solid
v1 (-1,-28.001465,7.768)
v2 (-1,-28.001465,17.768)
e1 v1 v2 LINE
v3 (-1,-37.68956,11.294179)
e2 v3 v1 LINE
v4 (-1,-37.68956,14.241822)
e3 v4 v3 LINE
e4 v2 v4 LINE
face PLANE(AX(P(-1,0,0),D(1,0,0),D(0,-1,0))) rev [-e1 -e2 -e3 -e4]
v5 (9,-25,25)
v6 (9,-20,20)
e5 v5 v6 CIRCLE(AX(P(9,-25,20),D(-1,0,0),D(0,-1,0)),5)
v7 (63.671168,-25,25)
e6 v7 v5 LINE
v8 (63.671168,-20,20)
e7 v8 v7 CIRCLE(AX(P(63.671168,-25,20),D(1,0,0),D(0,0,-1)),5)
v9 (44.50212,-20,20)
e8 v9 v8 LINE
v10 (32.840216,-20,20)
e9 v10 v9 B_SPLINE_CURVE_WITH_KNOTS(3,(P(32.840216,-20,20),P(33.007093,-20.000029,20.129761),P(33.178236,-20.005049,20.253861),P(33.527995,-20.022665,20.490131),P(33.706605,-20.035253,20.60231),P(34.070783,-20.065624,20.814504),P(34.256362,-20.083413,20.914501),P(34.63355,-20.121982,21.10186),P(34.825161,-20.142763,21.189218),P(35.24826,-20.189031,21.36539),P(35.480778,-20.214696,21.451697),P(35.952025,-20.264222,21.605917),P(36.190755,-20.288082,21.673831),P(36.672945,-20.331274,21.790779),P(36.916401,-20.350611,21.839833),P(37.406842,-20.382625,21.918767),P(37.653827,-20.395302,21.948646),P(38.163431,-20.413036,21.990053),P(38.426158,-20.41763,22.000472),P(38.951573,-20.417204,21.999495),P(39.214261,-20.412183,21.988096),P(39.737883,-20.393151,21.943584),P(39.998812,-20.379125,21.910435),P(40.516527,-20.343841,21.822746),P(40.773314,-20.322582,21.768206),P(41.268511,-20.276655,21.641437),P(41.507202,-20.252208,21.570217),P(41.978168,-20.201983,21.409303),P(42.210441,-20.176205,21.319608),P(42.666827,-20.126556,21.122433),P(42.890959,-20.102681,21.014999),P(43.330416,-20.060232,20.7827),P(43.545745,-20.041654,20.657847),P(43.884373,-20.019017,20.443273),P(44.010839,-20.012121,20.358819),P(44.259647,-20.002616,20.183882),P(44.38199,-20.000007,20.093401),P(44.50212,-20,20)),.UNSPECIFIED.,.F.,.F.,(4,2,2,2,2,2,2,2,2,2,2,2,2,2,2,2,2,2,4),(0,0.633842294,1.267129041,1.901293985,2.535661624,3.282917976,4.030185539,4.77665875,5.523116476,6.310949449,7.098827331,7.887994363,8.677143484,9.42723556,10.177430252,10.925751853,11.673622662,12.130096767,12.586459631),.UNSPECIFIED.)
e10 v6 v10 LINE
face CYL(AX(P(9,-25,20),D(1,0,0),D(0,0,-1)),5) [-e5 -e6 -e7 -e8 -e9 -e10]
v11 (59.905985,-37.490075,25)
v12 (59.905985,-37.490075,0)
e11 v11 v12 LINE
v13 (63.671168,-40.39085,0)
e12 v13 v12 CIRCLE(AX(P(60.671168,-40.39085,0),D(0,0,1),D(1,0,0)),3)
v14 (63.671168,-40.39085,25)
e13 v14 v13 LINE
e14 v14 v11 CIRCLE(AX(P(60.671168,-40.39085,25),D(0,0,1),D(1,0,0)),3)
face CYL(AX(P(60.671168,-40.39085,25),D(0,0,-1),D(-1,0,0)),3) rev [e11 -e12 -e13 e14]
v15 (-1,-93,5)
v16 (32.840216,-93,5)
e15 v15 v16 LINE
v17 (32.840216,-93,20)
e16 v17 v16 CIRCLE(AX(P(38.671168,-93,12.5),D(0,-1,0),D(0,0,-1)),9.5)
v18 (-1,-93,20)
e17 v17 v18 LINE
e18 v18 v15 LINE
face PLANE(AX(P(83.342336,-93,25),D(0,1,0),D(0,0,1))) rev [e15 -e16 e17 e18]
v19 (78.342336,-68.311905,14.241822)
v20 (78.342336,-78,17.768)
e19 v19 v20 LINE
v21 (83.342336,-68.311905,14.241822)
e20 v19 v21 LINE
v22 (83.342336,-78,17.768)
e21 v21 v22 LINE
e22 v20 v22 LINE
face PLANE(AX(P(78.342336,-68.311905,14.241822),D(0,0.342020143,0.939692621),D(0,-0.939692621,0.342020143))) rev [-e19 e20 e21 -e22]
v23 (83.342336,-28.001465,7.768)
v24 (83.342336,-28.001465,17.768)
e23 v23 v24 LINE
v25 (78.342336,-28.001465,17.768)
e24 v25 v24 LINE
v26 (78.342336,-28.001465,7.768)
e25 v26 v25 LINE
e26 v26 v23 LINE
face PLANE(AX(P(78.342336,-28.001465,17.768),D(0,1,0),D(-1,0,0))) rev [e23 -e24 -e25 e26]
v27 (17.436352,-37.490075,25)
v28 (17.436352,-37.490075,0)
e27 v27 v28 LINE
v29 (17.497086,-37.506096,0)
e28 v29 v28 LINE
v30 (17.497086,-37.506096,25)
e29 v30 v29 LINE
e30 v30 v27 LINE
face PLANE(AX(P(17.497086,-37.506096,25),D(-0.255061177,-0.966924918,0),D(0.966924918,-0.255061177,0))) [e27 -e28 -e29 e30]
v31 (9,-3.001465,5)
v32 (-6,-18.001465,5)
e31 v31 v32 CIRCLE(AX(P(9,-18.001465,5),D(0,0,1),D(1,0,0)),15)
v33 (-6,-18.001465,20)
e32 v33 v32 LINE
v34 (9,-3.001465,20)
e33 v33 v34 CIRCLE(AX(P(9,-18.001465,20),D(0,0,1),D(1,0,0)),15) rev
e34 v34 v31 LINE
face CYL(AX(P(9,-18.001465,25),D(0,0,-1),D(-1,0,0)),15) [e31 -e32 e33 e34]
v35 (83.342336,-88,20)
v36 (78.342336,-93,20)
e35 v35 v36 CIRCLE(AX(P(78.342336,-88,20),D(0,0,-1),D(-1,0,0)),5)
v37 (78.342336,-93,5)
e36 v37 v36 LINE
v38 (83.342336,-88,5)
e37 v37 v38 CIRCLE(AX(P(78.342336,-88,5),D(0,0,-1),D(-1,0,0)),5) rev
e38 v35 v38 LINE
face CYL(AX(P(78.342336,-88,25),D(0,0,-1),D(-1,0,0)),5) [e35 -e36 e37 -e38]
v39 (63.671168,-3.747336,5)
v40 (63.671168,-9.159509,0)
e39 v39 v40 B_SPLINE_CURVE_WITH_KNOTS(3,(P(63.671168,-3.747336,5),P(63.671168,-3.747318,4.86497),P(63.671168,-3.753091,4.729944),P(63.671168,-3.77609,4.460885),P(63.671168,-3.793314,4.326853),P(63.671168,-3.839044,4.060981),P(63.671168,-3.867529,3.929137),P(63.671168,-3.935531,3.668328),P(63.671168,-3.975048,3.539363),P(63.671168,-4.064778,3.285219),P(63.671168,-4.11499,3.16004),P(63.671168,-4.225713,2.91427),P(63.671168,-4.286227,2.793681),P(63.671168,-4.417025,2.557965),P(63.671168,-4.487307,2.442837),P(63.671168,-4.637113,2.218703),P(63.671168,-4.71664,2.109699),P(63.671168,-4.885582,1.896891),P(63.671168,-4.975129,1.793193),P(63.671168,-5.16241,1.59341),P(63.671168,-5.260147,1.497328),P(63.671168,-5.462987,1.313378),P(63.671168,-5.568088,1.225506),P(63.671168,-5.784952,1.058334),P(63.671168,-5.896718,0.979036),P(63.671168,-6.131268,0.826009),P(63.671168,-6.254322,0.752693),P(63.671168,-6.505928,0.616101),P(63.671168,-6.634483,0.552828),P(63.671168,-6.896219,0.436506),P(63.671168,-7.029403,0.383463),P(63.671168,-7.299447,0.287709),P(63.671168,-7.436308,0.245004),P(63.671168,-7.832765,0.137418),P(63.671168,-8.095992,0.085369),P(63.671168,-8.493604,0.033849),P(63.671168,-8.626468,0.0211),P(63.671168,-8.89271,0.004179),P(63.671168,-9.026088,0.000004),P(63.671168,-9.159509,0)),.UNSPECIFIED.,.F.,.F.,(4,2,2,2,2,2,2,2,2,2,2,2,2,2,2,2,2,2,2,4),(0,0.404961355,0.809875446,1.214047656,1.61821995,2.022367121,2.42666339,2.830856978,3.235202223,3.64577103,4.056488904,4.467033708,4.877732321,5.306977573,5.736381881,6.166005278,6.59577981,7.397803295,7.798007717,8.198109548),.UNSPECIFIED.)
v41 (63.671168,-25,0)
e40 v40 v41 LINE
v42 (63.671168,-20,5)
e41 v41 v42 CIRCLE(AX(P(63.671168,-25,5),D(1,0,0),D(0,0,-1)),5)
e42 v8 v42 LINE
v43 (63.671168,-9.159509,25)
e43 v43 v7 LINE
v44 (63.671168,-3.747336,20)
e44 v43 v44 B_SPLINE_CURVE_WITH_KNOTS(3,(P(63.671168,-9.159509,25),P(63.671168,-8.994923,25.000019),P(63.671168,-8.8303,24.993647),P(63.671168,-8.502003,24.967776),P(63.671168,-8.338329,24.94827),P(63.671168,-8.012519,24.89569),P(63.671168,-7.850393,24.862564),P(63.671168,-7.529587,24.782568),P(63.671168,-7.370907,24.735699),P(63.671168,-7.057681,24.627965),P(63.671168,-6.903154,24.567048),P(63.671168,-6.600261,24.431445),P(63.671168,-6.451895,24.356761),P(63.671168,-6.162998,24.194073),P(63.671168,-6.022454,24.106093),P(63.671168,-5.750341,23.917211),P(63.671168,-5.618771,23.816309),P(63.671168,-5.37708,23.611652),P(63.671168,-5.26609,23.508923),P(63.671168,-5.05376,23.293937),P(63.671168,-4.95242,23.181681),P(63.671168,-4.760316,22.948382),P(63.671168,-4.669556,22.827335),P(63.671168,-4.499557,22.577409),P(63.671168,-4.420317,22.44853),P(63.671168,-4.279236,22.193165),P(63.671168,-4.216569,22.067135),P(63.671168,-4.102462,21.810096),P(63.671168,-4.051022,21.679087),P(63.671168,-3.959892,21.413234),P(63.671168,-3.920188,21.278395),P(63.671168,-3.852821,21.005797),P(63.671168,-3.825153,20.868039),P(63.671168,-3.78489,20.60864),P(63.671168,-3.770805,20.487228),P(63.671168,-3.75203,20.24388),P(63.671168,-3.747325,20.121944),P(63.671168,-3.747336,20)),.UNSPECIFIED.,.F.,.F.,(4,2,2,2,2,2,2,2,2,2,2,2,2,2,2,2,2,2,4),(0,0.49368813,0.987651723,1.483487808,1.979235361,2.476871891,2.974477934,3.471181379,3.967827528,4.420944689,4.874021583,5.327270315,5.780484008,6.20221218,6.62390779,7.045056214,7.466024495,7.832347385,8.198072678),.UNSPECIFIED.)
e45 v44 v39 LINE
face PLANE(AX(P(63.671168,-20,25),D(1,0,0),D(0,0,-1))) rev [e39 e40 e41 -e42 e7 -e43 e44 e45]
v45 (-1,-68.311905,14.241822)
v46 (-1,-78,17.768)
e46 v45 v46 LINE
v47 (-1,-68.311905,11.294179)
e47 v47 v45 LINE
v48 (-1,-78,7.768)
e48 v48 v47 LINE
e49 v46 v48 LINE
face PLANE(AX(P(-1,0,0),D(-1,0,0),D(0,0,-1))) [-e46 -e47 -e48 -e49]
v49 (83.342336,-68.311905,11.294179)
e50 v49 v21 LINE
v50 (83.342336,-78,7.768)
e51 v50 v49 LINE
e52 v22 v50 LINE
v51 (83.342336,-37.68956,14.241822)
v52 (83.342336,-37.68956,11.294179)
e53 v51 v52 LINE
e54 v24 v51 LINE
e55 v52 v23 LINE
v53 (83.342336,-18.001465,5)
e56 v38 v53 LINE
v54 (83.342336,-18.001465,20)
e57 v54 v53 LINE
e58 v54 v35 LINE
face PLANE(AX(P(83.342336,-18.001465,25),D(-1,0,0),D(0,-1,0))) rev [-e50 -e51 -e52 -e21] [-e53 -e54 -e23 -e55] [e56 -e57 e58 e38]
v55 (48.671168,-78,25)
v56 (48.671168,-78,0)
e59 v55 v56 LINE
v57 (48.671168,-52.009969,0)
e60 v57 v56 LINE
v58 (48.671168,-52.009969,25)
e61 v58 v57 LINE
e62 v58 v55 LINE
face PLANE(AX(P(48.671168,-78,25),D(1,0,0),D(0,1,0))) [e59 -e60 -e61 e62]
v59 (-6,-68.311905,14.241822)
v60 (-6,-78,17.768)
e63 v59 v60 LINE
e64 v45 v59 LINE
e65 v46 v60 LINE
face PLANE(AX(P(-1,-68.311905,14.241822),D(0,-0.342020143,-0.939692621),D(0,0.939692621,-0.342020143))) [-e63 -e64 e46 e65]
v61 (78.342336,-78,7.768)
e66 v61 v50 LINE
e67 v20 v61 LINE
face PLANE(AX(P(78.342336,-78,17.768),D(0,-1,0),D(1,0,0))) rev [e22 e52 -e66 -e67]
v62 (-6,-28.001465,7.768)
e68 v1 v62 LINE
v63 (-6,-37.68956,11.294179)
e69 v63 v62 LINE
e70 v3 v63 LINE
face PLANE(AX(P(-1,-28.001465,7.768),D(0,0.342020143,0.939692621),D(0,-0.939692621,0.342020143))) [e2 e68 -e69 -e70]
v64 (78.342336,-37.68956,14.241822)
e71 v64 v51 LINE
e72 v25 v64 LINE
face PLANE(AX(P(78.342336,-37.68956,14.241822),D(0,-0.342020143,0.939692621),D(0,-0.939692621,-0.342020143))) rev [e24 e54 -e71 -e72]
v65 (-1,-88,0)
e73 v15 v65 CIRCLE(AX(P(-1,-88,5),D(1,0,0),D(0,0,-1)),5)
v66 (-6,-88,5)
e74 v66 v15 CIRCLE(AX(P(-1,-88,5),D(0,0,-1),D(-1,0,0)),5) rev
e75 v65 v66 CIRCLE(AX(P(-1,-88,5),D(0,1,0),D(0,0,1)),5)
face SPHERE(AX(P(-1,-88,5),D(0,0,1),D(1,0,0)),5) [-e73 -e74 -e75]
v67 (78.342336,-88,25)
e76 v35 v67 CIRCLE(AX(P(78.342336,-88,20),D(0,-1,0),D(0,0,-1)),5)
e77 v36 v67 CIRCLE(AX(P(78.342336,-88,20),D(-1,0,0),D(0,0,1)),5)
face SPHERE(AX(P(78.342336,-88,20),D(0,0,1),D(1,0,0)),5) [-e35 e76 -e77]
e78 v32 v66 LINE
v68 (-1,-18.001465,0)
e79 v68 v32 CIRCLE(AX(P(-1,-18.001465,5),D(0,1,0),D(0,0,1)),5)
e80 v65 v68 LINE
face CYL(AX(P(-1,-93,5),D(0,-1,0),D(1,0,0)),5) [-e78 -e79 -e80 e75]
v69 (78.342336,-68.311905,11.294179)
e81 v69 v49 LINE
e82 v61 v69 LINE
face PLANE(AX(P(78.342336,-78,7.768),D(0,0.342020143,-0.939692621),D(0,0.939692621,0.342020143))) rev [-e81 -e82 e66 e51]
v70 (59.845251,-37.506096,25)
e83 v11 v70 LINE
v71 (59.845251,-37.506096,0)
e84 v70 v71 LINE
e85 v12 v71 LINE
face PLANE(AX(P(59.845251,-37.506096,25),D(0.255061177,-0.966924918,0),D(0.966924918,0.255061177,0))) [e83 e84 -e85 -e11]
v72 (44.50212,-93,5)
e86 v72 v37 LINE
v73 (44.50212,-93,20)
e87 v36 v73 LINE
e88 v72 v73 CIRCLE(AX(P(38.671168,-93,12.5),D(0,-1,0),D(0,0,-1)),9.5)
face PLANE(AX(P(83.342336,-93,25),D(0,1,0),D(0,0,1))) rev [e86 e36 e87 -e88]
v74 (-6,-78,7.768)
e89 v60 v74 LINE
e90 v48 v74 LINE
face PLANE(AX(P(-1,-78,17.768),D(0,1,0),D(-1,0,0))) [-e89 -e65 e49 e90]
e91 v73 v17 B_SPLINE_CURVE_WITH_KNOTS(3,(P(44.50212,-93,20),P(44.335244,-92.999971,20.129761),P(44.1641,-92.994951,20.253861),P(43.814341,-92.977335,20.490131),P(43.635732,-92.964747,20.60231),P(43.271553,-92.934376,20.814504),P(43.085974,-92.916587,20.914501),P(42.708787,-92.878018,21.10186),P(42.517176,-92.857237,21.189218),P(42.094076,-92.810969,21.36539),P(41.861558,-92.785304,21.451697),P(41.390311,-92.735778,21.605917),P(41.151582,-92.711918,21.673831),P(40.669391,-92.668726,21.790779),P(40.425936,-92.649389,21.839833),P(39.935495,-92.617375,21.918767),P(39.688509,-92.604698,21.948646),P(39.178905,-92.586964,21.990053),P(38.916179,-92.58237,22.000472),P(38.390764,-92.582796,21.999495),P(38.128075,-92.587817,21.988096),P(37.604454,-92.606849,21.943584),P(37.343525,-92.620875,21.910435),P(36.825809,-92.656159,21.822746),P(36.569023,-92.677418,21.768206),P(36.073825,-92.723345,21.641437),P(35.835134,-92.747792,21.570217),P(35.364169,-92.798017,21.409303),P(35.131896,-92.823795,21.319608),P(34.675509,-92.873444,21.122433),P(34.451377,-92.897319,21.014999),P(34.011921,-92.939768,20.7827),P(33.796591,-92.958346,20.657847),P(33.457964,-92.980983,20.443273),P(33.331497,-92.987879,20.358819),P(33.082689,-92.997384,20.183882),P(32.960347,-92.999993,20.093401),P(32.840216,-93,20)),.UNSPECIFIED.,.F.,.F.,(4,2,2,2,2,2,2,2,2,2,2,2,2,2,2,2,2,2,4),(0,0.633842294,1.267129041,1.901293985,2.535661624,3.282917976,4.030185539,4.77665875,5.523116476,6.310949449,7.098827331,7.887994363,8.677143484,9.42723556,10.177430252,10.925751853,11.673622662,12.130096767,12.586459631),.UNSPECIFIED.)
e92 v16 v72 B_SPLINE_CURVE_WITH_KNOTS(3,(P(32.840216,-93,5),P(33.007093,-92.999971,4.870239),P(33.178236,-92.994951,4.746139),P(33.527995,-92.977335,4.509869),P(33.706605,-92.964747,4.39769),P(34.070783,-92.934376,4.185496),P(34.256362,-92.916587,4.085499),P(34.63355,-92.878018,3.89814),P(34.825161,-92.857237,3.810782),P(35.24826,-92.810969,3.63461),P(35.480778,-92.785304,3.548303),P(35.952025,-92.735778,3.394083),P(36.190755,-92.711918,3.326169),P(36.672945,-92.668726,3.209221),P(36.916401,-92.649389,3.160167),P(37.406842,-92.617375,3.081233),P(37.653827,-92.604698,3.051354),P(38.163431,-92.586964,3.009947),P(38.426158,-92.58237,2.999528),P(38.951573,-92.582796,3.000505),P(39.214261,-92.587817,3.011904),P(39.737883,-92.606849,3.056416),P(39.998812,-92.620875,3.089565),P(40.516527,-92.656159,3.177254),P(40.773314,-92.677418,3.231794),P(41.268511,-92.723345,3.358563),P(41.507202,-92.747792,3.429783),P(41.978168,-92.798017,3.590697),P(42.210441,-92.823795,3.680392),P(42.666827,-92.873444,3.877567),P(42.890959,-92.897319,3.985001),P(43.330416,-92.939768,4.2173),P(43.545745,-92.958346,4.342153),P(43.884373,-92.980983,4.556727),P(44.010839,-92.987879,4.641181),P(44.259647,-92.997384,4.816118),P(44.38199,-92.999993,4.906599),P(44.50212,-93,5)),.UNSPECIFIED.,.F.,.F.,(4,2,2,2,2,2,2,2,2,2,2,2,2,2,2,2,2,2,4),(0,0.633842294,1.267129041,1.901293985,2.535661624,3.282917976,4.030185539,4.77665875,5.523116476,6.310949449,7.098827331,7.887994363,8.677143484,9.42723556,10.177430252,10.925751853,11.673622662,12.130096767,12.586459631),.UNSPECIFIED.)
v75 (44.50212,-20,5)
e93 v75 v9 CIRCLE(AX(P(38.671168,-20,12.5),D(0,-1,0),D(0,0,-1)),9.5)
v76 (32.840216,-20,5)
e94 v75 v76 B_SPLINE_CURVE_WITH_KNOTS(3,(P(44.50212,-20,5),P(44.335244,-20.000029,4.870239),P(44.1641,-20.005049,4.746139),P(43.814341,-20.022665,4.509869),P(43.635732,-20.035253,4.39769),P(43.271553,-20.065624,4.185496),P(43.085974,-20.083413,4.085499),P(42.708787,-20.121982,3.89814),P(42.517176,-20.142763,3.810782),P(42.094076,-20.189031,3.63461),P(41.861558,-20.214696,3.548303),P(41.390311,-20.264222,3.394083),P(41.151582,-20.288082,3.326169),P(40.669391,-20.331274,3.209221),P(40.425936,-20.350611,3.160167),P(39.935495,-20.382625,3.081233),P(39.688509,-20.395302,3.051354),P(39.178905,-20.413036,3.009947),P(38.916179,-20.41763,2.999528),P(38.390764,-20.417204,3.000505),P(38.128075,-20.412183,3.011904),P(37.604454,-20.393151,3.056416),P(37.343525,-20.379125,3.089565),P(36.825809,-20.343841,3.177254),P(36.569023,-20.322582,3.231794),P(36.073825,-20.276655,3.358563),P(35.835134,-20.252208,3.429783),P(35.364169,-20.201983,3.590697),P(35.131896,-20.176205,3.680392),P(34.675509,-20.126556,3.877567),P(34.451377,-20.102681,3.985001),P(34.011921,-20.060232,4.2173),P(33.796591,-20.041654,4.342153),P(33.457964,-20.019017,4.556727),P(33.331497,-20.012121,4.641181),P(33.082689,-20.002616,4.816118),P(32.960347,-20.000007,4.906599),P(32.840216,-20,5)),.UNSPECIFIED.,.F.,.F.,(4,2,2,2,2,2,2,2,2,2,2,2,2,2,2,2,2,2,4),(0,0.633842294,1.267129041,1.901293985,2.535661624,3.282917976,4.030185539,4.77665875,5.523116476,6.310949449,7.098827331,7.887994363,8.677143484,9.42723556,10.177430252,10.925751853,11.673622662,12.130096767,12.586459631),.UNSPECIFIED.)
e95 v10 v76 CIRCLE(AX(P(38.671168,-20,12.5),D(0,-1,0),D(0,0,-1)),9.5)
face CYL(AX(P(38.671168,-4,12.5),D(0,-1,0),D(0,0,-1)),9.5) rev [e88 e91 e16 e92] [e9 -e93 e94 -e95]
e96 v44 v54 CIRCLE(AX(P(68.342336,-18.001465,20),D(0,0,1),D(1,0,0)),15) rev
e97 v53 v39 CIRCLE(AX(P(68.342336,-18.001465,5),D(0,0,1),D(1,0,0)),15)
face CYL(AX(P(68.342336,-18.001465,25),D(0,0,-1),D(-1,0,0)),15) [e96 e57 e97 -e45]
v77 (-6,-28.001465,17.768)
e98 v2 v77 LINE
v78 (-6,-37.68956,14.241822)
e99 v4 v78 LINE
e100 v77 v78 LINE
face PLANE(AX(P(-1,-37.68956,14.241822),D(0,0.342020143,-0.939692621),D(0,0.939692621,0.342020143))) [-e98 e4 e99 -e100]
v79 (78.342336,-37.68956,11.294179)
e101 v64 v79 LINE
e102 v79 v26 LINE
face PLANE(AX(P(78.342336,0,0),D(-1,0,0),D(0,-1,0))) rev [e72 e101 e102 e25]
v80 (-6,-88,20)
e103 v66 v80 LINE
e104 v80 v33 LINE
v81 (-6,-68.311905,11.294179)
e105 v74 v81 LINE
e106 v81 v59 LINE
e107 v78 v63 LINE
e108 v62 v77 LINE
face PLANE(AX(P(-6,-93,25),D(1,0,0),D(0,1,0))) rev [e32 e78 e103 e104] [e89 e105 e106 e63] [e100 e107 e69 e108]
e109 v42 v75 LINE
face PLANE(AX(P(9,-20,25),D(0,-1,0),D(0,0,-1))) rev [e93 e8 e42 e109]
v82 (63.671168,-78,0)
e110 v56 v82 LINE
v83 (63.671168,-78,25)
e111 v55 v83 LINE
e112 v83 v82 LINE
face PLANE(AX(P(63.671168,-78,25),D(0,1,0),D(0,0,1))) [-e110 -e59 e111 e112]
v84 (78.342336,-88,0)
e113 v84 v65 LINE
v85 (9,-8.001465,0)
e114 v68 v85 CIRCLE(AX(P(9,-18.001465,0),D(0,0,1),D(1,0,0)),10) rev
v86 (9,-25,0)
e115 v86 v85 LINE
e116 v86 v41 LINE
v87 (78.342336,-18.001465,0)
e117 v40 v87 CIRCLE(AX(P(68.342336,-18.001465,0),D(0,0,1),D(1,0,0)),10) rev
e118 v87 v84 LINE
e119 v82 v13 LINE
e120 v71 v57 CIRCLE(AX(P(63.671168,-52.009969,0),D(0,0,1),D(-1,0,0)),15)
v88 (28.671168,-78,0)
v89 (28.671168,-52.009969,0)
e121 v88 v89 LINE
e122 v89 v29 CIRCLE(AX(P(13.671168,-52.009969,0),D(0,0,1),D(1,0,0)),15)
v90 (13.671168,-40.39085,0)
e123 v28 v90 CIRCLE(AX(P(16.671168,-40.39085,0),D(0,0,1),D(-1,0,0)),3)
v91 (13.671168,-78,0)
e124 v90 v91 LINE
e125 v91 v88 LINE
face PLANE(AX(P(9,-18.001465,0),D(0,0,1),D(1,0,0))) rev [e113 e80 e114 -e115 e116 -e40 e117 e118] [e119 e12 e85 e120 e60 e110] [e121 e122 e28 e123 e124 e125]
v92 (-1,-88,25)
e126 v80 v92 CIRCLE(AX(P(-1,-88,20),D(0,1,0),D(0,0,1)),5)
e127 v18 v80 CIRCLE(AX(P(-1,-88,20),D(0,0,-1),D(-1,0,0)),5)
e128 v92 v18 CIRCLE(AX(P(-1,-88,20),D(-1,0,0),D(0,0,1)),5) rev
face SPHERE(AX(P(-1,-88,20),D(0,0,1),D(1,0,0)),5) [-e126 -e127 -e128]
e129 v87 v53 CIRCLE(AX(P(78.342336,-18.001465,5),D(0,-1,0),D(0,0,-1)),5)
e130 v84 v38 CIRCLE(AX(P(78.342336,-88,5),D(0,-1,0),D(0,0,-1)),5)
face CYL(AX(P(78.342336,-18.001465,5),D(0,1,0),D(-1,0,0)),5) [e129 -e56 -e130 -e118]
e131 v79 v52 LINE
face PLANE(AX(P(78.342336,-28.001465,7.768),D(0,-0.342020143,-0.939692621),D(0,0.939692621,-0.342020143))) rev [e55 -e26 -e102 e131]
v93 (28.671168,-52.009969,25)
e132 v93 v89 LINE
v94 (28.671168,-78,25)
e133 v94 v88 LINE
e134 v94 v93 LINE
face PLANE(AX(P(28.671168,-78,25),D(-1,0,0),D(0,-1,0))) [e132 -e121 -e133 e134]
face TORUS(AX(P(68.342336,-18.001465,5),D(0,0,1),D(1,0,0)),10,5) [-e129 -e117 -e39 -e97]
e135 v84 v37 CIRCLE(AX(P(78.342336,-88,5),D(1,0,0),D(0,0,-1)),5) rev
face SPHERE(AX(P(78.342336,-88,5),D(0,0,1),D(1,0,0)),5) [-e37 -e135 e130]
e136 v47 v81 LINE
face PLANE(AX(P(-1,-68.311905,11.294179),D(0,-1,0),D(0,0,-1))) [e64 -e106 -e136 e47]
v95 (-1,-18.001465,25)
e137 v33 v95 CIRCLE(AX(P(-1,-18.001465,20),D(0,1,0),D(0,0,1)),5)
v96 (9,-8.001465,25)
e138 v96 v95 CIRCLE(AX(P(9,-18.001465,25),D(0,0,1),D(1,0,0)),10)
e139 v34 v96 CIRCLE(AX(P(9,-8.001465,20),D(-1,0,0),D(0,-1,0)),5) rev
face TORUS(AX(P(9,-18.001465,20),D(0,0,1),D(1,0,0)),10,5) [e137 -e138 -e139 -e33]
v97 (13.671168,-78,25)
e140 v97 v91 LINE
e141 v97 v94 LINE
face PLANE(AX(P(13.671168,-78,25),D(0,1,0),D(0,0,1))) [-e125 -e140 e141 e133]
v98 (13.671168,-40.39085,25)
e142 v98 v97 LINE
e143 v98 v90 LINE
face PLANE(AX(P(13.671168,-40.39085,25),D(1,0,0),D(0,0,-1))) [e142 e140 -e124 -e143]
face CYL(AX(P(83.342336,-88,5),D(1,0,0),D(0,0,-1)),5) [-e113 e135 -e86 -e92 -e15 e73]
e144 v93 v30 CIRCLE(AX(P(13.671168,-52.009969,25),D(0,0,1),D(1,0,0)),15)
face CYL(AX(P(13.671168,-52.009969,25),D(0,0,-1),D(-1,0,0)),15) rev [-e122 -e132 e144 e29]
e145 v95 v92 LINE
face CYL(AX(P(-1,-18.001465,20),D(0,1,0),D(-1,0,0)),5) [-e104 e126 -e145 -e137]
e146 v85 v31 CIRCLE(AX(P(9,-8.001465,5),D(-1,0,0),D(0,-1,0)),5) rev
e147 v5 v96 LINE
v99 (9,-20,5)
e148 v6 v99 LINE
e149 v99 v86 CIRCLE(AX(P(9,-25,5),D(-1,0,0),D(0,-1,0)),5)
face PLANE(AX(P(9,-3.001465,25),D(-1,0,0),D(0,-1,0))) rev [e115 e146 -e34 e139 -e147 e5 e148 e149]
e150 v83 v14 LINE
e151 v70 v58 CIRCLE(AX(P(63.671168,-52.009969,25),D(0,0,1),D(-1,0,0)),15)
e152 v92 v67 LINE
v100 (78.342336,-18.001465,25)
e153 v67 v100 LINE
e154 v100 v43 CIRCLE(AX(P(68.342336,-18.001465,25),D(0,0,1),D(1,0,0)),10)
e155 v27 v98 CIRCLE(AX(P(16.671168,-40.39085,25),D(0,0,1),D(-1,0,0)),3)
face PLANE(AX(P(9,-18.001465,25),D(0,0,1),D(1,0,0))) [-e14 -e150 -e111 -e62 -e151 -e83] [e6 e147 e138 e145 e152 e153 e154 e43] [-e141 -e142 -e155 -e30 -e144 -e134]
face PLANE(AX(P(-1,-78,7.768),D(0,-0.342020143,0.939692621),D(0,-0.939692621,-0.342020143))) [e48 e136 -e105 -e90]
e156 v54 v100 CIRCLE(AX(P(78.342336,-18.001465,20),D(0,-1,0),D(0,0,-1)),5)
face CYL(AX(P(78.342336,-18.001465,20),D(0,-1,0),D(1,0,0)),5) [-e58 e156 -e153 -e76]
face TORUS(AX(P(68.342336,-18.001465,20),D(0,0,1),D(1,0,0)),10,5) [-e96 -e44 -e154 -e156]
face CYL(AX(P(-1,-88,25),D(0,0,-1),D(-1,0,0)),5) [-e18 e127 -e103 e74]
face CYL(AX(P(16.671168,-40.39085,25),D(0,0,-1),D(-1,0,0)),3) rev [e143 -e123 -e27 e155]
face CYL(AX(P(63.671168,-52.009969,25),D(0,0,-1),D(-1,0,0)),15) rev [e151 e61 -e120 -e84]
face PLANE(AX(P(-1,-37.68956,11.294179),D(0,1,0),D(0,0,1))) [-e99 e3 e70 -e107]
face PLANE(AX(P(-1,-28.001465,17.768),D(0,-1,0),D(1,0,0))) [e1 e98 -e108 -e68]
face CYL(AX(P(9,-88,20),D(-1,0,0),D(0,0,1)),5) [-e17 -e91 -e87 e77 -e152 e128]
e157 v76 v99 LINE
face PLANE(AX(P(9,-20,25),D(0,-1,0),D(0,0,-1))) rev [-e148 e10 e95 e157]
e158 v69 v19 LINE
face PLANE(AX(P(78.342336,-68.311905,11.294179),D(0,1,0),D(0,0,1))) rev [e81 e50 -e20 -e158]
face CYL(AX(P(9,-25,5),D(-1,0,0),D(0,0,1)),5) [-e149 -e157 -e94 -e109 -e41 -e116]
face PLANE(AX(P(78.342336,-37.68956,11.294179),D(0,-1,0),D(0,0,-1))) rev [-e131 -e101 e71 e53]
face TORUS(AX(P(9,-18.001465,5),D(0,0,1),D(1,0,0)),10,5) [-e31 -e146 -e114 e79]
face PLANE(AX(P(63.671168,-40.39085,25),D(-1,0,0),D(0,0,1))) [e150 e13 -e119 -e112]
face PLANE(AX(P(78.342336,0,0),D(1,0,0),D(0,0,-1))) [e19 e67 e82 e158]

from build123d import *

# Parameters (mm, degrees)
BOSS_EXTRUDE1_DEPTH = 25
SKETCH2_R           = 9.5
CUT_EXTRUDE1_DEPTH  = 89
FILLET1_R           = 5
FILLET2_R           = 5
FILLET3_R           = 5
CUT_EXTRUDE2_DEPTH  = 5


with BuildPart() as part:
    # Sketch1 → Boss-Extrude1 (new body)
    with BuildSketch(Plane.XY):
        with BuildLine():
            Line((83.342336402, -18.001464661), (83.342336402, -93))
            Line((83.342336402, -93), (-6, -93))
            Line((-6, -93), (-6, -18.001464661))
            ThreePointArc((-6, -18.001464661), (-1.606601718, -7.394862943), (9, -3.001464661))
            Line((9, -3.001464661), (9, -20))
            Line((9, -20), (63.671168201, -20))
            Line((63.671168201, -20), (63.671168201, -3.747335869))
            ThreePointArc((63.671168201, -3.747335869), (77.143827099, -5.855117), (83.342336402, -18.001464661))
        make_face()
        with BuildLine():
            Line((63.671168201, -40.39084965), (63.671168201, -78))
            Line((63.671168201, -78), (48.671168201, -78))
            Line((48.671168201, -78), (48.671168201, -52.009969466))
            ThreePointArc((48.671168201, -52.009969466), (51.788643958, -42.855428646), (59.845250549, -37.506095703))
            Line((59.845250549, -37.506095703), (59.905984671, -37.490074897))
            ThreePointArc((59.905984671, -37.490074897), (62.502076365, -38.014344801), (63.671168201, -40.39084965))
        make_face(mode=Mode.SUBTRACT)
        with BuildLine():
            Line((28.671168201, -78), (28.671168201, -52.009969466))
            ThreePointArc((28.671168201, -52.009969466), (25.553692444, -42.855428646), (17.497085853, -37.506095703))
            Line((17.497085853, -37.506095703), (17.436351731, -37.490074897))
            ThreePointArc((17.436351731, -37.490074897), (14.840260037, -38.014344801), (13.671168201, -40.39084965))
            Line((13.671168201, -40.39084965), (13.671168201, -78))
            Line((13.671168201, -78), (28.671168201, -78))
        make_face(mode=Mode.SUBTRACT)
    extrude(amount=BOSS_EXTRUDE1_DEPTH)

    # Sketch2 → Cut-Extrude1 (cut)
    with BuildSketch(Plane.XZ.offset(93)):
        with Locations(Location((38.671168201, 12.5, 0), (0, 0, 270))):
            Circle(SKETCH2_R)
    extrude(amount=-CUT_EXTRUDE1_DEPTH, mode=Mode.SUBTRACT)

    # Fillet1
    # the kernel refuses this fillet: 5 mm, written as the material it takes off along each edge
    with BuildSketch(Plane(origin=(95.842336402, -93, 0), x_dir=(0, 1, 0), z_dir=(-1, 0, 0))) as fillet1_piece_1:
        with BuildLine():
            CenterArc((FILLET1_R, -FILLET1_R), FILLET1_R, 90, 90)
            Line((0, -FILLET1_R), (0, 0))
            Line((0, 0), (FILLET1_R, 0))
        make_face()
    extrude(amount=114.342336402, mode=Mode.SUBTRACT)
    with BuildSketch(Plane(origin=(83.342336402, -93, -12.5), x_dir=(0, 1, 0), z_dir=(0, 0, 1)), Plane(origin=(-6, -93, -12.5), x_dir=(1, 0, 0), z_dir=(0, 0, 1))) as fillet1_piece_2:
        with BuildLine():
            CenterArc((FILLET1_R, FILLET1_R), FILLET1_R, 180, 90)
            Line((0, FILLET1_R), (0, 0))
            Line((0, 0), (FILLET1_R, 0))
        make_face()
    extrude(amount=50, mode=Mode.SUBTRACT)
    with BuildSketch(Plane(origin=(95.842336402, -93, 25), x_dir=(0, 1, 0), z_dir=(-1, 0, 0))) as fillet1_piece_3:
        with BuildLine():
            CenterArc((FILLET1_R, FILLET1_R), FILLET1_R, 180, 90)
            Line((0, FILLET1_R), (0, 0))
            Line((0, 0), (FILLET1_R, 0))
        make_face()
    extrude(amount=114.342336402, mode=Mode.SUBTRACT)

    # Fillet2
    # the kernel refuses this fillet: 5 mm, written as the material it takes off along each edge
    with BuildSketch(Plane(origin=(78.342336402, -88, 20), x_dir=(0, 0, 1), z_dir=(1, 0, 0))) as fillet2_piece_1_section:
        Polygon((0, 0), (FILLET2_R * 1.02, 0), (FILLET2_R * 1.02, FILLET2_R * 1.02), (0, FILLET2_R * 1.02), align=None)
    fillet2_piece_1 = extrude(amount=FILLET2_R * 1.02, mode=Mode.PRIVATE)
    fillet2_piece_1 = fillet2_piece_1 - Plane(origin=(78.342336402, -88, 20), x_dir=(0, 0.7071067811865475, -0.7071067811865475), z_dir=(1, 0, 0)) * Sphere(FILLET2_R, mode=Mode.PRIVATE)
    add(fillet2_piece_1, mode=Mode.SUBTRACT)
    with BuildSketch(Plane(origin=(78.342336402, -88, 5), x_dir=(0, 0, -1), z_dir=(1, 0, 0))) as fillet2_piece_2_section:
        Polygon((0, 0), (FILLET2_R * 1.02, 0), (FILLET2_R * 1.02, -FILLET2_R * 1.02), (0, -FILLET2_R * 1.02), align=None)
    fillet2_piece_2 = extrude(amount=FILLET2_R * 1.02, mode=Mode.PRIVATE)
    fillet2_piece_2 = fillet2_piece_2 - Plane(origin=(78.342336402, -88, 5), x_dir=(0, 0.7071067811865475, 0.7071067811865475), z_dir=(1, 0, 0)) * Sphere(FILLET2_R, mode=Mode.PRIVATE)
    add(fillet2_piece_2, mode=Mode.SUBTRACT)
    with BuildSketch(Plane(origin=(-1, -88, 20), x_dir=(-1, 0, 0), z_dir=(0, 0, 1))) as fillet2_piece_3_section:
        Polygon((0, 0), (FILLET2_R * 1.02, 0), (FILLET2_R * 1.02, FILLET2_R * 1.02), (0, FILLET2_R * 1.02), align=None)
    fillet2_piece_3 = extrude(amount=FILLET2_R * 1.02, mode=Mode.PRIVATE)
    fillet2_piece_3 = fillet2_piece_3 - Plane(origin=(-1, -88, 20), x_dir=(0.7071067811865476, 0.7071067811865475, 0), z_dir=(0, 0, 1)) * Sphere(FILLET2_R, mode=Mode.PRIVATE)
    add(fillet2_piece_3, mode=Mode.SUBTRACT)
    with BuildSketch(Plane(origin=(-1, -88, 5), x_dir=(-1, 0, 0), z_dir=(0, 0, -1))) as fillet2_piece_4_section:
        Polygon((0, 0), (FILLET2_R * 1.02, 0), (FILLET2_R * 1.02, -FILLET2_R * 1.02), (0, -FILLET2_R * 1.02), align=None)
    fillet2_piece_4 = extrude(amount=FILLET2_R * 1.02, mode=Mode.PRIVATE)
    fillet2_piece_4 = fillet2_piece_4 - Plane(origin=(-1, -88, 5), x_dir=(0.7071067811865476, 0.7071067811865475, 0), z_dir=(0, 0, -1)) * Sphere(FILLET2_R, mode=Mode.PRIVATE)
    add(fillet2_piece_4, mode=Mode.SUBTRACT)
    with BuildSketch(Plane(origin=(68.342336402, -18.001464661, 0), x_dir=(-0.9129658100806721, 0.4080360641214722, 0), z_dir=(-0.4080360641214722, -0.9129658100806721, 0))) as fillet2_piece_5_section:
        with BuildLine():
            CenterArc((15 - FILLET2_R, -FILLET2_R), FILLET2_R, 0, 90)
            Line((15 - FILLET2_R, 0), (15 - FILLET2_R, FILLET2_R * 0.02))
            Line((15 - FILLET2_R, FILLET2_R * 0.02), (15 + FILLET2_R * 0.02, FILLET2_R * 0.02))
            Line((15 + FILLET2_R * 0.02, FILLET2_R * 0.02), (15 + FILLET2_R * 0.02, -FILLET2_R))
            Line((15 + FILLET2_R * 0.02, -FILLET2_R), (15, -FILLET2_R))
        make_face()
    fillet2_piece_5 = revolve(axis=Axis((68.342336402, -18.001464661, 0), (0, 0, -1)), revolution_arc=155.918477011, mode=Mode.PRIVATE)
    fillet2_piece_5 = split(fillet2_piece_5, bisect_by=Plane(origin=(63.671168201, -6.375046545, 1.425351683), z_dir=(1, 0, 0)), keep=Keep.TOP, mode=Mode.PRIVATE)
    add(fillet2_piece_5, mode=Mode.SUBTRACT)
    with BuildSketch(Plane(origin=(-6, -88, 0), x_dir=(1, 0, 0), z_dir=(0, 1, 0)), Plane(origin=(83.342336402, -18.001464661, 25), x_dir=(0, 0, -1), z_dir=(0, -1, 0))) as fillet2_piece_6:
        with BuildLine():
            CenterArc((FILLET2_R, -FILLET2_R), FILLET2_R, 90, 90)
            Line((0, -FILLET2_R), (-FILLET2_R * 0.02, -FILLET2_R))
            Line((-FILLET2_R * 0.02, -FILLET2_R), (-FILLET2_R * 0.02, FILLET2_R * 0.02))
            Line((-FILLET2_R * 0.02, FILLET2_R * 0.02), (FILLET2_R, FILLET2_R * 0.02))
            Line((FILLET2_R, FILLET2_R * 0.02), (FILLET2_R, 0))
        make_face()
    extrude(amount=69.998535339, mode=Mode.SUBTRACT)
    with BuildSketch(Plane(origin=(68.342336402, -18.001464661, 25), x_dir=(-0.9129658100806721, 0.4080360641214721, 0), z_dir=(-0.4080360641214721, -0.9129658100806721, 0))) as fillet2_piece_7_section:
        with BuildLine():
            CenterArc((15 - FILLET2_R, FILLET2_R), FILLET2_R, 270, 90)
            Line((15 - FILLET2_R, 0), (15 - FILLET2_R, -FILLET2_R * 0.02))
            Line((15 - FILLET2_R, -FILLET2_R * 0.02), (15 + FILLET2_R * 0.02, -FILLET2_R * 0.02))
            Line((15 + FILLET2_R * 0.02, -FILLET2_R * 0.02), (15 + FILLET2_R * 0.02, FILLET2_R))
            Line((15 + FILLET2_R * 0.02, FILLET2_R), (15, FILLET2_R))
        make_face()
    fillet2_piece_7 = revolve(axis=Axis((68.342336402, -18.001464661, 25), (0, 0, -1)), revolution_arc=155.918477011, mode=Mode.PRIVATE)
    fillet2_piece_7 = split(fillet2_piece_7, bisect_by=Plane(origin=(63.671168201, -6.375046545, 23.574648317), z_dir=(1, 0, 0)), keep=Keep.TOP, mode=Mode.PRIVATE)
    add(fillet2_piece_7, mode=Mode.SUBTRACT)
    with BuildSketch(Plane(origin=(9, -18.001464661, 25), x_dir=(-1, 0, 0), z_dir=(0, -1, 0))) as fillet2_piece_8:
        with BuildLine():
            CenterArc((15 - FILLET2_R, FILLET2_R), FILLET2_R, 270, 90)
            Line((15, FILLET2_R), (15 + FILLET2_R * 0.02, FILLET2_R))
            Line((15 + FILLET2_R * 0.02, FILLET2_R), (15 + FILLET2_R * 0.02, -FILLET2_R * 0.02))
            Line((15 + FILLET2_R * 0.02, -FILLET2_R * 0.02), (15 - FILLET2_R, -FILLET2_R * 0.02))
            Line((15 - FILLET2_R, -FILLET2_R * 0.02), (15 - FILLET2_R, 0))
        make_face()
    revolve(axis=Axis((9, -18.001464661, 25), (0, 0, -1)), revolution_arc=90, mode=Mode.SUBTRACT)
    with BuildSketch(Plane(origin=(-6, -88, 25), x_dir=(1, 0, 0), z_dir=(0, 1, 0)), Plane(origin=(83.342336402, -18.001464661, 0), x_dir=(0, 0, 1), z_dir=(0, -1, 0))) as fillet2_piece_9:
        with BuildLine():
            CenterArc((FILLET2_R, FILLET2_R), FILLET2_R, 180, 90)
            Line((0, FILLET2_R), (-FILLET2_R * 0.02, FILLET2_R))
            Line((-FILLET2_R * 0.02, FILLET2_R), (-FILLET2_R * 0.02, -FILLET2_R * 0.02))
            Line((-FILLET2_R * 0.02, -FILLET2_R * 0.02), (FILLET2_R, -FILLET2_R * 0.02))
            Line((FILLET2_R, -FILLET2_R * 0.02), (FILLET2_R, 0))
        make_face()
    extrude(amount=69.998535339, mode=Mode.SUBTRACT)
    with BuildSketch(Plane(origin=(9, -18.001464661, 0), x_dir=(-1, 0, 0), z_dir=(0, -1, 0))) as fillet2_piece_10:
        with BuildLine():
            CenterArc((15 - FILLET2_R, -FILLET2_R), FILLET2_R, 0, 90)
            Line((15, -FILLET2_R), (15 + FILLET2_R * 0.02, -FILLET2_R))
            Line((15 + FILLET2_R * 0.02, -FILLET2_R), (15 + FILLET2_R * 0.02, FILLET2_R * 0.02))
            Line((15 + FILLET2_R * 0.02, FILLET2_R * 0.02), (15 - FILLET2_R, FILLET2_R * 0.02))
            Line((15 - FILLET2_R, FILLET2_R * 0.02), (15 - FILLET2_R, 0))
        make_face()
    revolve(axis=Axis((9, -18.001464661, 0), (0, 0, -1)), revolution_arc=90, mode=Mode.SUBTRACT)

    # Fillet3
    # the kernel refuses this fillet: 5 mm, written as the material it takes off along each edge
    with BuildSketch(Plane(origin=(9, -20, 25), x_dir=(0, -1, 0), z_dir=(1, 0, 0))) as fillet3_piece_1:
        with BuildLine():
            CenterArc((FILLET3_R, FILLET3_R), FILLET3_R, 180, 90)
            Line((0, FILLET3_R), (0, 0))
            Line((0, 0), (FILLET3_R, 0))
        make_face()
    extrude(amount=54.671168201, mode=Mode.SUBTRACT)
    with BuildSketch(Plane(origin=(9, -20, 0), x_dir=(0, -1, 0), z_dir=(1, 0, 0))) as fillet3_piece_2:
        with BuildLine():
            CenterArc((FILLET3_R, -FILLET3_R), FILLET3_R, 90, 90)
            Line((0, -FILLET3_R), (0, 0))
            Line((0, 0), (FILLET3_R, 0))
        make_face()
    extrude(amount=54.671168201, mode=Mode.SUBTRACT)

    # Sketch3 → Cut-Extrude2 (cut)
    with BuildSketch(Plane(origin=(83.342336402, 0, 0), x_dir=(0, 0, -1), z_dir=(1, 0, 0))):
        Polygon((-17.768000409, -28.001464661), (-7.768000409, -28.001464661), (-11.294178767, -37.689560075), (-14.241822052, -37.689560075), align=None)
        Polygon((-11.294178767, -68.311904586), (-14.241822052, -68.311904586), (-17.768000409, -78), (-7.768000409, -78), align=None)
    cut_extrude2 = extrude(amount=-CUT_EXTRUDE2_DEPTH, mode=Mode.SUBTRACT)

    # Mirror1: Cut-Extrude2 across plane
    add(cut_extrude2.mirror(Plane(origin=(38.671168201, 0, 0), x_dir=(0, 0, 1), z_dir=(1, 0, 0))), mode=Mode.SUBTRACT)


solid = part.part
